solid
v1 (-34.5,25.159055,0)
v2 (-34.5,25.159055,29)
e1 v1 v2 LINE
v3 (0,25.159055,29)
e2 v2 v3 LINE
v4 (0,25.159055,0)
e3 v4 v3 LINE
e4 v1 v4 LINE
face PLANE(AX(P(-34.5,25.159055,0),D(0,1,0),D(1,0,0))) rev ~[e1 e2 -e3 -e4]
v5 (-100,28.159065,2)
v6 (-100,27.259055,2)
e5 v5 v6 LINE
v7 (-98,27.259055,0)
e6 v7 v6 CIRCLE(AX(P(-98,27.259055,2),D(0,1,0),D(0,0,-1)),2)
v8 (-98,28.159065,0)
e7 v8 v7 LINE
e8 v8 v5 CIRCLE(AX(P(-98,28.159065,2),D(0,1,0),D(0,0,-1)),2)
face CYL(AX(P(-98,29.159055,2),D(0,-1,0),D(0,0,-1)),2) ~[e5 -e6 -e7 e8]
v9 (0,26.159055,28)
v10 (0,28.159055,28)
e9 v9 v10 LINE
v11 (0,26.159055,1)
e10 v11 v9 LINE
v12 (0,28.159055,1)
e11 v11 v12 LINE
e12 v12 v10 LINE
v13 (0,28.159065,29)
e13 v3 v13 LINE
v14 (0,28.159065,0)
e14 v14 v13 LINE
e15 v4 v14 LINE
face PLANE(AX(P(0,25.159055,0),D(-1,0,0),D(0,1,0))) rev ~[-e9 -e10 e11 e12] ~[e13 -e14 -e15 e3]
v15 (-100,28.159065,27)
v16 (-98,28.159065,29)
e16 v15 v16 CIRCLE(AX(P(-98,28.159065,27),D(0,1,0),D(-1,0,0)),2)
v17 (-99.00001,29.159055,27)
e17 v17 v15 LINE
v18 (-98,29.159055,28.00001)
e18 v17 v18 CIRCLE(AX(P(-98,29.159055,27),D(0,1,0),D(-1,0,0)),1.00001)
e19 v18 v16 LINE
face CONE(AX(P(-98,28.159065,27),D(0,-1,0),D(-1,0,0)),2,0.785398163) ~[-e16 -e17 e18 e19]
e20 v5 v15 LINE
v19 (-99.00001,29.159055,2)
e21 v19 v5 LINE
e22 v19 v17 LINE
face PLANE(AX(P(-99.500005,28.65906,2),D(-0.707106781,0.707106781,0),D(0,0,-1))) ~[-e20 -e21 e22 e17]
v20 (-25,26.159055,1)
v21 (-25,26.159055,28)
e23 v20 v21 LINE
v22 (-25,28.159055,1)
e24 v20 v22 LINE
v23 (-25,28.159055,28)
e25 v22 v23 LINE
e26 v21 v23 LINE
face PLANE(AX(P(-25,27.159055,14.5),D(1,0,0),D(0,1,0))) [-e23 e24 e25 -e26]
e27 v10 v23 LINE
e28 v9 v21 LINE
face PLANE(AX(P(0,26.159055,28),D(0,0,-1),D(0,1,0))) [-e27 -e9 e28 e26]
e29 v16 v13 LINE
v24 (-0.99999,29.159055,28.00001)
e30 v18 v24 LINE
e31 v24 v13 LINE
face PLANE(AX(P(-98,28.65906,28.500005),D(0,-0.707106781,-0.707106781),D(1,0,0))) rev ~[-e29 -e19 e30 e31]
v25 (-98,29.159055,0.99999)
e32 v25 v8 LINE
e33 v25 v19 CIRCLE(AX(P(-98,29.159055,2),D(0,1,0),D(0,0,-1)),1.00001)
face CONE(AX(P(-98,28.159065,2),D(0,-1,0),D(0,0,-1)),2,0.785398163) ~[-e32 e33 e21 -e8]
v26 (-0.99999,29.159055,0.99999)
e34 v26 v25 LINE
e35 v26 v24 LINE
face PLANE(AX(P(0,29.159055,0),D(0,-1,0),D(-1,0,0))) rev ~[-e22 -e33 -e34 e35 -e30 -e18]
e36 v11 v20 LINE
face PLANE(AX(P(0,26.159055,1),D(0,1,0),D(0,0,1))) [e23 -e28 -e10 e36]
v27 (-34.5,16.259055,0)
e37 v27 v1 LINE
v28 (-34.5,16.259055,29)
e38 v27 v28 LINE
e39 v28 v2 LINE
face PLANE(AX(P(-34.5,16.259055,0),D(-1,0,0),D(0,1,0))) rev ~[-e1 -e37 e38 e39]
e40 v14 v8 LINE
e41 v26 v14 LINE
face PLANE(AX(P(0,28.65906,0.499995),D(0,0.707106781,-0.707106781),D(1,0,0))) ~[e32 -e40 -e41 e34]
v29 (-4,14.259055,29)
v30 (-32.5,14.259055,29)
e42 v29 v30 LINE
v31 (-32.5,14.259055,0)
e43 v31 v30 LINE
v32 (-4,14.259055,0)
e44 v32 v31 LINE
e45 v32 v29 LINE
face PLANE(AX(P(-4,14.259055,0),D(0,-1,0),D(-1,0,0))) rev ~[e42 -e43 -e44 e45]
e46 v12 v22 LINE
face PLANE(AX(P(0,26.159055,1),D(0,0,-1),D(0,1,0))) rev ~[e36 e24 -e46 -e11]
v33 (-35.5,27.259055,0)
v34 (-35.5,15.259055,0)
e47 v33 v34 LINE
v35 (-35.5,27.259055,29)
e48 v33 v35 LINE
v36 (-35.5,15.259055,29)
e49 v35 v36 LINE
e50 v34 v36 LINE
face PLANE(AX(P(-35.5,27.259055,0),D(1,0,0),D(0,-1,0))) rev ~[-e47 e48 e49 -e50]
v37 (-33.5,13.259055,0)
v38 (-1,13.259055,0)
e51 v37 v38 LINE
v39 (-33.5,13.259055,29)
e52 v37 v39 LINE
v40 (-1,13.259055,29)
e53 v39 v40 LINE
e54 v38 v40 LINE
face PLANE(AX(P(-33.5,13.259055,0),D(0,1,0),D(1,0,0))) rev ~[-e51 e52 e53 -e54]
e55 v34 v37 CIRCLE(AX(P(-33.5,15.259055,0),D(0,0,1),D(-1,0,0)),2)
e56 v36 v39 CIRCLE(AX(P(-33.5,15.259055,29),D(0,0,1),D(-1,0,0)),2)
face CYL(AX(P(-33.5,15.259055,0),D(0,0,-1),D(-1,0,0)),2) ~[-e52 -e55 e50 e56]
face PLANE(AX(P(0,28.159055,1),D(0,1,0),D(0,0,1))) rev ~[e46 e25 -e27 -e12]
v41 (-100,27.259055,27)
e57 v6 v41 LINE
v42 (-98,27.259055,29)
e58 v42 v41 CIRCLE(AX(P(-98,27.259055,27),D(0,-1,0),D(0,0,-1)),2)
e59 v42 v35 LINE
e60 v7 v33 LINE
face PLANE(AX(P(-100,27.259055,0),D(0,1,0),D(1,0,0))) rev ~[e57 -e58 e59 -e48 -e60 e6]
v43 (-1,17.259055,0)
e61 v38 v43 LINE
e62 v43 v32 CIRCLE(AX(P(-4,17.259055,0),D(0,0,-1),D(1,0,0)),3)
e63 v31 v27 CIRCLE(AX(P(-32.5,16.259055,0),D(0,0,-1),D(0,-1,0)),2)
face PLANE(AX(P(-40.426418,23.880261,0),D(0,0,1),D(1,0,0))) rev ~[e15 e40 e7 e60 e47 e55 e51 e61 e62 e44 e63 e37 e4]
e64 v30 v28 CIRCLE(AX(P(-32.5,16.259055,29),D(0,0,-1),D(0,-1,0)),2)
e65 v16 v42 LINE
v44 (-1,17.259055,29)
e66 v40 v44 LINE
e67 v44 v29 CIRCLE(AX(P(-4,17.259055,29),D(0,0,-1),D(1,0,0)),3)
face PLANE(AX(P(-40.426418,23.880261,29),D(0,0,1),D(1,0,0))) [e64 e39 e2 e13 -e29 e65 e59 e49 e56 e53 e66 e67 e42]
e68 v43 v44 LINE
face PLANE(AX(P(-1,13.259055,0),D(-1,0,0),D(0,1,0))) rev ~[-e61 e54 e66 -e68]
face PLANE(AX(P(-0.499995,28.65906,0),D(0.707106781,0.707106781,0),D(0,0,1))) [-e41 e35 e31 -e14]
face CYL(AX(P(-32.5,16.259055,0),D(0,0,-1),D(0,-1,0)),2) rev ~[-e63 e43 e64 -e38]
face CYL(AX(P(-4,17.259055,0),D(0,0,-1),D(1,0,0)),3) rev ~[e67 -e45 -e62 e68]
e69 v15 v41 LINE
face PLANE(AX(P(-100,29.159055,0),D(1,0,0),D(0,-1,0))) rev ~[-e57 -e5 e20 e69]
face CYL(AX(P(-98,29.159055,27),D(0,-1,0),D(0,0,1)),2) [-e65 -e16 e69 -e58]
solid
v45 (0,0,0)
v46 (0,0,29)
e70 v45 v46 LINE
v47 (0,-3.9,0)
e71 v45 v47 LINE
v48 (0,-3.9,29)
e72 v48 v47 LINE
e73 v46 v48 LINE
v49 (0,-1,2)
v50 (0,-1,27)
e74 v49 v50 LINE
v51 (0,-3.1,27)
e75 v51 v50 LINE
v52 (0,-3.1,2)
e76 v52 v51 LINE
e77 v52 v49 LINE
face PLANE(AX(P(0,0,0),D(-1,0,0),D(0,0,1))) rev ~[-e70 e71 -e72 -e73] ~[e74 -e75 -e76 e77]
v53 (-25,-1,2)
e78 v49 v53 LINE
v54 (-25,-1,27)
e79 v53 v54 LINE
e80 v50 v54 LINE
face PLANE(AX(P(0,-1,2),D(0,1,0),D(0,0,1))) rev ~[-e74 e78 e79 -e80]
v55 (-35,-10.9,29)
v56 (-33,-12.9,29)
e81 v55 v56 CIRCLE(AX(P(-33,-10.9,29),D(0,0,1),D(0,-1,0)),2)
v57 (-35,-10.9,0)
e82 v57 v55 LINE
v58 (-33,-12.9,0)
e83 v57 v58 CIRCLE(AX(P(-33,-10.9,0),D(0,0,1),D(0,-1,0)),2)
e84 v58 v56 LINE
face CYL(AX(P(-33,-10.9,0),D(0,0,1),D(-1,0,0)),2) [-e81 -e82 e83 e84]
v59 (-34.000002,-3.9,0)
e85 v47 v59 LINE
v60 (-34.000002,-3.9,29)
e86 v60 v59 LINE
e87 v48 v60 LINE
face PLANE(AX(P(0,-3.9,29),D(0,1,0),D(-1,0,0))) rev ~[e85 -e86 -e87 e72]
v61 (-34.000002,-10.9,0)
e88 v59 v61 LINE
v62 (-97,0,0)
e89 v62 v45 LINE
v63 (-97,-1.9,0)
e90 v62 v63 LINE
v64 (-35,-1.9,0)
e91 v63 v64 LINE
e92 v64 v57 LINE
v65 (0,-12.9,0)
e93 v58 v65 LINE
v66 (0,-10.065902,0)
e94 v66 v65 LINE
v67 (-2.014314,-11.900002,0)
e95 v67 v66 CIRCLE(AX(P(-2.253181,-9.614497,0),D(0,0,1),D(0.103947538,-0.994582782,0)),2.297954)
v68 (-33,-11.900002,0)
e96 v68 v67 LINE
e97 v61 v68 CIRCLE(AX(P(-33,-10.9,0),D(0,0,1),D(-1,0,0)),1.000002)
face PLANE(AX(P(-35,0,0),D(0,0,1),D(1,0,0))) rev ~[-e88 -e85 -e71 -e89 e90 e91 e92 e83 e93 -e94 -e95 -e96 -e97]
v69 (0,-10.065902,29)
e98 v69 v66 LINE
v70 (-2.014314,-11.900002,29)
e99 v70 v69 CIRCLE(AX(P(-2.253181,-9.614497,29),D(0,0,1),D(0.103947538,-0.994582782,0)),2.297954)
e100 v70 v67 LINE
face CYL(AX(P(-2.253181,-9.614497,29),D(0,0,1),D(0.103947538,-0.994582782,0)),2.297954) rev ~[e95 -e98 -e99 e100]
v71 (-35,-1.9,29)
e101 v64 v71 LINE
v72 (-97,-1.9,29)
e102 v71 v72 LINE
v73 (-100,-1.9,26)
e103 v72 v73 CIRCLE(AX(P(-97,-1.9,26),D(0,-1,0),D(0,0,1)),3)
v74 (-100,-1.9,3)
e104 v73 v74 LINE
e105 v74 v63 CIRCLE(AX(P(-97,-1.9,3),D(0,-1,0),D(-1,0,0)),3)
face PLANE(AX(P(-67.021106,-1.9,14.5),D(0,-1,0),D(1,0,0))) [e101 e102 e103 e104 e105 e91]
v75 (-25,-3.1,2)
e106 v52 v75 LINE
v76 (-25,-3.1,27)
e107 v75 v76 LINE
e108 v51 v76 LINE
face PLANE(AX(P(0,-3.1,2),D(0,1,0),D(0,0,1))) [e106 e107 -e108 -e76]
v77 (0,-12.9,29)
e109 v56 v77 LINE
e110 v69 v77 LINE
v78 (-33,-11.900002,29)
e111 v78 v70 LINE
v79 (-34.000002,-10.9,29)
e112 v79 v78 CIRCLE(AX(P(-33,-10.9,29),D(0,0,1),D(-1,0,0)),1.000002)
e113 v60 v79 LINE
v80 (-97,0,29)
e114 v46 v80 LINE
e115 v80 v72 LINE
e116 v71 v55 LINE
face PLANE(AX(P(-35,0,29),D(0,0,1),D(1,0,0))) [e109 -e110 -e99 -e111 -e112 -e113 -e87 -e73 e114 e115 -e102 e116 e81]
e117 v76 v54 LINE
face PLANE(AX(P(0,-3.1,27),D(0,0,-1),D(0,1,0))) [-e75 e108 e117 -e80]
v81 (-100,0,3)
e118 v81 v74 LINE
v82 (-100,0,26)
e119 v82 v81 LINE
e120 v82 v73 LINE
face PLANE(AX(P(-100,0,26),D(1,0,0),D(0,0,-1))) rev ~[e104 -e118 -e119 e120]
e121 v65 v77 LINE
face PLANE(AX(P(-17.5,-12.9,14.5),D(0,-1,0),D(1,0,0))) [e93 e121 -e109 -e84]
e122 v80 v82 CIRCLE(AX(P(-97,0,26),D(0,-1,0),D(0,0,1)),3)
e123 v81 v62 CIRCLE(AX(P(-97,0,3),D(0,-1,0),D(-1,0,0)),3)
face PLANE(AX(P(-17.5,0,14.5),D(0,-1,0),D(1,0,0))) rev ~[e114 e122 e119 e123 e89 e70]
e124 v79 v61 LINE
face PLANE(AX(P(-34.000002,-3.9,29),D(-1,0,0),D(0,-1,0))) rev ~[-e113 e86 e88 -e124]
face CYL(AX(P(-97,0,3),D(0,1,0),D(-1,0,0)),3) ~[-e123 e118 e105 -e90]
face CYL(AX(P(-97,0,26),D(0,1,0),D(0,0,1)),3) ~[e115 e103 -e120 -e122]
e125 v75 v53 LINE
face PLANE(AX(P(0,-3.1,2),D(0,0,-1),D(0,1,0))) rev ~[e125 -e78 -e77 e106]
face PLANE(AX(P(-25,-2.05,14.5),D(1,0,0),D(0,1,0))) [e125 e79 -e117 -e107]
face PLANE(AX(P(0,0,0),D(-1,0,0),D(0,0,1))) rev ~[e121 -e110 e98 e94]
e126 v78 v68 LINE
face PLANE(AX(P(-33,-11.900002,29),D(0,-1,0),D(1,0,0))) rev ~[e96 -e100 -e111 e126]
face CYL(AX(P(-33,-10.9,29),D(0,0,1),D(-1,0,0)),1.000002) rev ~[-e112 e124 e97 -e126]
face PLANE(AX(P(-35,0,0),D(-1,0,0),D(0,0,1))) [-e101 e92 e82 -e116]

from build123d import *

# Parameters (mm, degrees)
F1_DEPTH  = 1.9
F0_W      = 35
F0_H      = 29
F2_DEPTH  = 12.9
F3_W      = 2.1
F3_H      = 25
F4_DEPTH  = 25
F5_R      = 2
F7_DEPTH  = 29
F9_DEPTH  = 29
F10_W     = 2
F10_H     = 27
F11_DEPTH = 25
F14_R     = 2
F15_SIZE  = 0.99999


# Not quite as in the source:
# - a fillet or chamfer is up to 0.001 mm smaller than in the source, because OpenCascade refuses the exact size


with BuildPart() as f1:
    # F0 (on Front) → F1 (new body)
    with BuildSketch(Plane.XZ):
        with BuildLine():
            Line((-97, 0), (-35, 0))
            Line((-35, 0), (-35, 29))
            Line((-35, 29), (-97, 29))
            ThreePointArc((-97, 29), (-99.1213203436, 28.1213203436), (-100, 26))
            Line((-100, 26), (-100, 3))
            ThreePointArc((-100, 3), (-99.1213203436, 0.8786796564), (-97, 0))
        make_face()
    extrude(amount=F1_DEPTH)

    # F0 (on Front) → F2 (join)
    with BuildSketch(Plane.XZ):
        with Locations((-17.5, 14.5)):
            Rectangle(F0_W, F0_H)
    extrude(amount=F2_DEPTH)

    # F3 (on face) → F4 (cut)
    with BuildSketch(Plane.YZ):
        with Locations((-2.05, 14.5)):
            Rectangle(F3_W, F3_H)
    extrude(amount=-F4_DEPTH, mode=Mode.SUBTRACT)

    # F5
    f5_edges = [f1.edges().sort_by_distance(p)[0] for p in [
        (-35, -12.9, 14.5),
    ]]
    fillet(f5_edges, radius=F5_R)

    # F6 (on face) → F7 (cut)
    with BuildSketch(Plane.XY.offset(29)):
        with BuildLine():
            Line((-34.0000018477, -3.9), (-34.0000018477, -10.9))
            ThreePointArc((-34.0000018477, -10.9), (-33.7071080877, -11.6071080877), (-33, -11.9000018477))
            Line((-33, -11.9000018477), (-2.4920476135, -11.9000018477))
            Line((-2.4920476135, -11.9000018477), (-2.0143143377, -11.9000018477))
            ThreePointArc((-2.0143143377, -11.9000018477), (-0.7060689283, -11.3136245624), (0, -10.0659022213))
            Line((0, -10.0659022213), (0, -9.1630909592))
            Line((0, -9.1630909592), (0, -3.9))
            Line((0, -3.9), (-34.0000018477, -3.9))
        make_face()
    extrude(amount=-F7_DEPTH, mode=Mode.SUBTRACT)


with BuildPart() as f9:
    # F8 (on Top) → F9 (new body)
    with BuildSketch(Plane.XY):
        with BuildLine():
            Line((0, 25.1590552804), (0, 29.1590552804))
            Line((0, 29.1590552804), (-100, 29.1590552804))
            Line((-100, 29.1590552804), (-100, 27.2590552804))
            Line((-100, 27.2590552804), (-35.5, 27.2590552804))
            Line((-35.5, 27.2590552804), (-35.5, 15.2590552804))
            ThreePointArc((-35.5, 15.2590552804), (-34.9142135624, 13.8448417181), (-33.5, 13.2590552804))
            Line((-33.5, 13.2590552804), (-1, 13.2590552804))
            Line((-1, 13.2590552804), (-1, 17.2590552804))
            ThreePointArc((-1, 17.2590552804), (-1.8786796564, 15.1377349369), (-4, 14.2590552804))
            Line((-4, 14.2590552804), (-32.5, 14.2590552804))
            ThreePointArc((-32.5, 14.2590552804), (-33.9142135624, 14.8448417181), (-34.5, 16.2590552804))
            Line((-34.5, 16.2590552804), (-34.5, 25.1590552804))
            Line((-34.5, 25.1590552804), (0, 25.1590552804))
        make_face()
    extrude(amount=F9_DEPTH)

    # F10 (on face) → F11 (cut)
    with BuildSketch(Plane.YZ):
        with Locations((27.1590552804, 14.5)):
            Rectangle(F10_W, F10_H)
    extrude(amount=-F11_DEPTH, mode=Mode.SUBTRACT)


with BuildPart() as f12_1:
    # F12: copy of F9
    add(f9.part.moved(Location((0, 30, 0))))


with BuildPart() as f9_1:
    add(f9.part)

    # F14
    f14_edges = [f9_1.edges().sort_by_distance(p)[0] for p in [
        (-100, 28.209055, 29),
        (-100, 28.209055, 0),
    ]]
    fillet(f14_edges, radius=F14_R)

    # F15 (size 1 in the source; OpenCascade refuses exactly that, so slightly less here)
    f15_edges = [f9_1.edges().sort_by_distance(p)[0] for p in [
        (-100, 29.159055, 14.5),
        (-99.414214, 29.159055, 0.585786),
        (-99.414214, 29.159055, 28.414214),
        (-49, 29.159055, 0),
        (-49, 29.159055, 29),
        (0, 29.159055, 14.5),
    ]]
    chamfer(f15_edges, length=F15_SIZE)


solid = Compound([f1.part, f9_1.part])
